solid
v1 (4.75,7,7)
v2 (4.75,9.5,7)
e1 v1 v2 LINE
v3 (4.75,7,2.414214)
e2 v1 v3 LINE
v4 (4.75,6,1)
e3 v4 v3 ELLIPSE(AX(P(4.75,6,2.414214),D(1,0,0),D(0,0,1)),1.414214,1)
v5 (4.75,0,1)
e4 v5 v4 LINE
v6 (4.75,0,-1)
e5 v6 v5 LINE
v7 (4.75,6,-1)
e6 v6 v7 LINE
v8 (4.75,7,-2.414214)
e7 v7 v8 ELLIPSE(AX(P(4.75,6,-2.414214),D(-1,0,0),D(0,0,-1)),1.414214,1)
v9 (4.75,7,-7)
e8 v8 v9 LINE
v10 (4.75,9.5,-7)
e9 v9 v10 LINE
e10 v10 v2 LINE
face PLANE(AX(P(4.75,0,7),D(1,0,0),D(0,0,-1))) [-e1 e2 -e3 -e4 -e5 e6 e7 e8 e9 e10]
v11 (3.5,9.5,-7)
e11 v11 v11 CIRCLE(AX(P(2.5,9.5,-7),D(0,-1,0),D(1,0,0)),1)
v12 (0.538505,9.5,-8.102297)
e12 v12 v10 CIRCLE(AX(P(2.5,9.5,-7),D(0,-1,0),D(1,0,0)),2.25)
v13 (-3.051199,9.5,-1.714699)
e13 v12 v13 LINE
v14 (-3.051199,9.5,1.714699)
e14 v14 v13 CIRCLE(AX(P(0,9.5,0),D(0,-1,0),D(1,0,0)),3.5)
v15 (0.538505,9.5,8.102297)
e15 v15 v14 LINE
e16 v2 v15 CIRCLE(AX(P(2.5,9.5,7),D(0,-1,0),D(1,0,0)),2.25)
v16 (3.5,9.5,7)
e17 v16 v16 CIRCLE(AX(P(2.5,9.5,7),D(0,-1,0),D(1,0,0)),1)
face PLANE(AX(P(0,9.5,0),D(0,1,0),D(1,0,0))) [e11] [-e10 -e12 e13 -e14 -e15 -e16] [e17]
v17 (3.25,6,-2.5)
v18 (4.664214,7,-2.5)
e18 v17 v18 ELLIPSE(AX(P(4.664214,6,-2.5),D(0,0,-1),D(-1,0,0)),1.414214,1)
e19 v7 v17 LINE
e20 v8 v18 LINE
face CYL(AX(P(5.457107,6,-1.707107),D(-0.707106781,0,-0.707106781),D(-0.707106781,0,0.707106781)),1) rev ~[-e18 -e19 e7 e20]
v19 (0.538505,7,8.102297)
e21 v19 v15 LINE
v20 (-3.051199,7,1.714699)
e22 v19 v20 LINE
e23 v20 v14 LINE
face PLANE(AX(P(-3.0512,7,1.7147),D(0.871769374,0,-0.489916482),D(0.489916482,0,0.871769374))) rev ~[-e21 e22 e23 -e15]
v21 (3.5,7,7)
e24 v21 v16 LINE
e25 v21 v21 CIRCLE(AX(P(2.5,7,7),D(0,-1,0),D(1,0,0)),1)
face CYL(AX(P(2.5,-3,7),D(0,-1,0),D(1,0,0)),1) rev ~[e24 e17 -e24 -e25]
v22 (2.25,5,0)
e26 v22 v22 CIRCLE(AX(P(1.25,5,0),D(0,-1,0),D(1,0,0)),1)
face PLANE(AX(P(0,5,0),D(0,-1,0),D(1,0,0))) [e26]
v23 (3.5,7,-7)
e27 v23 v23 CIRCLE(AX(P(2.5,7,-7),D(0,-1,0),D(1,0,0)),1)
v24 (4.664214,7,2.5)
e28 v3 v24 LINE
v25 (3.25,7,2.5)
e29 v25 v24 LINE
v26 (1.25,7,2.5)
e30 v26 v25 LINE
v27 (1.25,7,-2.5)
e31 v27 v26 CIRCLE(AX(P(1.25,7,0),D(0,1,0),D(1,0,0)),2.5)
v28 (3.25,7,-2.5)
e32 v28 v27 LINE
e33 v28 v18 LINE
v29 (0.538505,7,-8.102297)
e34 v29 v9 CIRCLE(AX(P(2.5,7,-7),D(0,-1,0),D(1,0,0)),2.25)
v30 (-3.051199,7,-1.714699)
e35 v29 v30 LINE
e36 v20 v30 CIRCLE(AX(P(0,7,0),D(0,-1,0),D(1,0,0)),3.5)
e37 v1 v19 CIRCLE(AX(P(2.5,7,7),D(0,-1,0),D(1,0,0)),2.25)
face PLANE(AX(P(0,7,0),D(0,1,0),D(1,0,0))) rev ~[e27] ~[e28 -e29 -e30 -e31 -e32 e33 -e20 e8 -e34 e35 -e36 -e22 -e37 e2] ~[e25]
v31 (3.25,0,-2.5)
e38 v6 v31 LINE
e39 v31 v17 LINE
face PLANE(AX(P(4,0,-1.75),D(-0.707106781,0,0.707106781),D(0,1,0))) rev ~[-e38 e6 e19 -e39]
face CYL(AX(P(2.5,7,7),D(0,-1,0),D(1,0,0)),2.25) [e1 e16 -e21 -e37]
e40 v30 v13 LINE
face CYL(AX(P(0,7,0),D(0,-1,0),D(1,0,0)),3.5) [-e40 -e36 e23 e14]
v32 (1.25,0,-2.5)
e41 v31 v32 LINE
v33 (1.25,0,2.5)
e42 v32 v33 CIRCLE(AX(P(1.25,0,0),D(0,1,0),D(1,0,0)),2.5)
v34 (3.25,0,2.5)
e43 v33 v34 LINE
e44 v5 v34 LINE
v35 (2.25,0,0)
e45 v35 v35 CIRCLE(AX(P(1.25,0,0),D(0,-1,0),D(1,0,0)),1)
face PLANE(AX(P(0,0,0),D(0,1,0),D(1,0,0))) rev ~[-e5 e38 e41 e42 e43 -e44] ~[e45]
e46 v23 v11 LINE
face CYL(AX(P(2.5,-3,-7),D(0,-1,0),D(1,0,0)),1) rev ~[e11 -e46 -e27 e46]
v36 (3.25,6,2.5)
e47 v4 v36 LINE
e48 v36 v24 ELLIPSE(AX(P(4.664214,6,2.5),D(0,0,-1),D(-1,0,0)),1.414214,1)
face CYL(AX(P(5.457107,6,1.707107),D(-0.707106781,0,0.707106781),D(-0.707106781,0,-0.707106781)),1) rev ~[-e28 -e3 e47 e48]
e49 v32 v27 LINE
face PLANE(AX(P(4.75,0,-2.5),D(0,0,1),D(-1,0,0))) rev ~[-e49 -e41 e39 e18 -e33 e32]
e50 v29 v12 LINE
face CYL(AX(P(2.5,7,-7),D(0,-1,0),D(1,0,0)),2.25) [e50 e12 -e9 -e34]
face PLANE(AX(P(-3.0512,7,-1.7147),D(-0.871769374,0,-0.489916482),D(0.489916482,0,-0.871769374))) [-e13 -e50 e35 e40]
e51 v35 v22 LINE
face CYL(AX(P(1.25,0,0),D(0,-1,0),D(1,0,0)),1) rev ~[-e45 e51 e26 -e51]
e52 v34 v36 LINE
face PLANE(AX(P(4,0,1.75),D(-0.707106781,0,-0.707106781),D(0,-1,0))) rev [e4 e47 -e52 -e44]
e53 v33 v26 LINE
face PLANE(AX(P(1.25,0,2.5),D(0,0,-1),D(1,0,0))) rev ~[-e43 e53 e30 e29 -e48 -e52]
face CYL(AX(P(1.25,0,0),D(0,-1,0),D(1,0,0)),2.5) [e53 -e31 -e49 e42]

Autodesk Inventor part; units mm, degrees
ref_plane "YZ Plane" through (0, 0, 0) normal (1, 0, 0) x (0, 1, 0)
ref_plane "XZ Plane" through (0, 0, 0) normal (0, 1, 0) x (-1, 0, 0)
ref_plane "XY Plane" through (0, 0, 0) normal (0, 0, 1) x (1, 0, 0)
sketch "Sketch1" plane through (0, 0, 0) normal (0, 1, 0) x (-1, 0, 0)
  circle A0 centre (0, 0) radius 2.5
  dimension "d0" = 5
extrude "Extrusion1" add sketch "Sketch1" along normal blind 7
sketch "Sketch2" plane through (0, 7, 0) normal (0, 1, 0) x (1, 0, 0)
  circle A0 centre (0, 0) radius 2.5 projected
  circle A1 centre (0, 0) radius 3.5
  line L0 (0, 0) -> (2.5, 0)
  line L1 (2.5, 0) -> (2.5, 7)
  line L2 (2.5, 0) -> (2.5, -7)
  circle A2 centre (2.5, -7) radius 2.25
  circle A3 centre (2.5, 7) radius 2.25
  line L3 (0, 0) -> (-3.0512, -1.7147)
  line L4 (-3.0512, -1.7147) -> (0.5385, -8.1023)
  line L5 (2.5, -7) -> (0.5385, -8.1023)
  line L6 (2.5, 7) -> (0.5385, 8.1023)
  line L7 (0, 0) -> (-3.0512, 1.7147)
  line L8 (-3.0512, 1.7147) -> (0.5385, 8.1023)
  line L9 (2.5, -7) -> (4.75, -7)
  line L10 (2.5, 7) -> (4.75, 7)
  line L11 (4.75, 7) -> (4.75, -7)
  dimension "d3" = 7
  dimension "d4" = 2.5
  dimension "d5" = 7
  dimension "d6" = 7
  dimension "d7" = 4.5
  dimension "d8" = 4.5
extrude "Extrusion2" add sketch "Sketch2" along normal blind 3
sketch "Sketch4" plane through (0, 0, 0) normal (0, -1, 0) x (1, 0, 0)
  line L0 (4.75, 7) -> (4.75, -7) projected
  arc A0 (4.75, 7) -> (0.5385, 8.1023) centre (2.5, 7) ccw projected
  line L1 (-3.0512, 1.7147) -> (0.5385, 8.1023) projected
  arc A1 (-3.0512, 1.7147) -> (-3.0512, -1.7147) centre (0, 0) ccw projected
  line L2 (0.5385, -8.1023) -> (-3.0512, -1.7147) projected
  arc A2 (0.5385, -8.1023) -> (4.75, -7) centre (2.5, -7) ccw projected
  circle A3 centre (0, 0) radius 2.5 projected
extrude "Extrusion4" add sketch "Sketch4" along normal blind 3 contours L0 A2 L2 A1 L1 A0 | A3
sketch "Sketch5" plane through (0, 7, 0) normal (0, -1, 0) x (1, 0, 0)
  circle A0 centre (0, 0) radius 2.5 projected
  line L0 (4.75, -7) -> (4.75, 7) projected
  line L1 (0, 0) -> (0, 2.5)
  circle A1 centre (0, 0) radius 2.5 projected
  line L2 (4.75, -7) -> (4.75, 7) projected
  line L3 (0, 2.5) -> (4.75, 2.5)
  line L4 (4.75, 2.5) -> (4.75, -2.5)
  line L5 (4.75, -2.5) -> (0, -2.5)
  line L6 (0, -2.5) -> (0, 2.5)
  point P0 (6.25, 2.5)
  point P1 (4.75, 7.3386)
  point P2 (4.75, 2.5)
extrude "Extrusion5" add sketch "Sketch5" along normal up to surface (7 mm away) contours A0 L3 L0 L5
sketch "Sketch7" plane through (0, -3, 0) normal (0, -1, 0) x (1, 0, 0)
  arc A0 (0.5385, -8.1023) -> (4.75, -7) centre (2.5, -7) ccw projected
  line L0 (4.75, -7) -> (4.75, 7) projected
  arc A1 (4.75, 7) -> (0.5385, 8.1023) centre (2.5, 7) ccw projected
  line L1 (0.5385, 8.1023) -> (-3.0512, 1.7147) projected
  arc A2 (-3.0512, 1.7147) -> (-3.0512, -1.7147) centre (0, 0) ccw projected
  line L2 (-3.0512, -1.7147) -> (0.5385, -8.1023) projected
  circle A3 centre (2.5, -7) radius 1
  circle A4 centre (2.5, 7) radius 1
  dimension "d27" = 2
  dimension "d28" = 2
extrude "Extrusion7" cut sketch "Sketch7" against normal up to surface (13 mm away) contours A3 | A4
thicken "Thicken1" operation add thickness 0.5 both sides no extend neighbours yes toward (0, 1, 0) faces at (0.73, -3, -0.5716)
thicken "Thicken2" operation add thickness 0.5 both sides no extend neighbours yes toward (0, -1, 0) faces at (0.73, 10, 0.5716)
sketch "Sketch8" plane through (0, 0, 0) normal (0, 1, 0) x (1, 0, 0)
  arc A0 (0, 2.5) -> (0, -2.5) centre (0, 0) ccw projected
  line L0 (0, 0) -> (1.5, 0)
  circle A1 centre (1.5, 0) radius 2.5
  line L1 (0, 2.5) -> (4.75, 2.5) projected
  line L2 (4.75, -2.5) -> (0, -2.5) projected
  line L3 (1.5, 0) -> (1.5, 2.5)
  line L4 (1.5, 2.5) -> (0, 2.5)
  line L5 (1.5, 0) -> (1.375, -2.5)
  line L6 (1.375, -2.5) -> (0, -2.5)
  line L7 (0, -2.5) -> (1.5, -2.5)
  line L8 (1.5, -2.5) -> (1.5, 2.5)
  line L9 (1.5, 2.5) -> (0, 2.5)
  line L10 (0, 2.5) -> (0, -2.5)
  point P0 (2.75, 2.5)
  point P1 (2.75, -2.5)
  point P2 (1.3752, -2.4969)
  point P3 (3.75, 2.5)
  point P4 (3.75, -2.5)
  dimension "d36" = 5
  dimension "d35" = 1.5
extrude "Extrusion8" cut sketch "Sketch8" along normal up to surface (7 mm away) contours L10 A1 A0 | L1 A1 L10 | L10 A1 L5 L2
sketch "Sketch11" plane through (0, 7, 0) normal (0, -1, 0) x (1, 0, 0)
  circle A0 centre (2.5, 7) radius 1 projected
  circle A1 centre (2.5, -7) radius 1 projected
  line L0 (-3.0512, 1.7147) -> (0.5385, 8.1023) projected
  arc A2 (4.75, 7) -> (0.5385, 8.1023) centre (2.5, 7) ccw projected
  line L1 (4.75, 7) -> (4.75, -7) projected
  arc A3 (0.5385, -8.1023) -> (4.75, -7) centre (2.5, -7) ccw projected
  line L2 (0.5385, -8.1023) -> (-3.0512, -1.7147) projected
  arc A4 (-3.0512, 1.7147) -> (-3.0512, -1.7147) centre (0, 0) ccw projected
extrude "Extrusion9" cut sketch "Sketch11" along normal up to surface (7 mm away)
sketch "Sketch12" plane through (0, 0, 0) normal (0, 1, 0) x (1, 0, 0)
  circle A0 centre (2.5, -7) radius 1 projected
  circle A1 centre (2.5, 7) radius 1 projected
  line L0 (4.75, 7) -> (4.75, -7) projected
  arc A2 (4.75, 7) -> (0.5385, 8.1023) centre (2.5, 7) ccw projected
  line L1 (-3.0512, 1.7147) -> (0.5385, 8.1023) projected
  arc A3 (-3.0512, 1.7147) -> (-3.0512, -1.7147) centre (0, 0) ccw projected
  line L2 (0.5385, -8.1023) -> (-3.0512, -1.7147) projected
  arc A4 (0.5385, -8.1023) -> (4.75, -7) centre (2.5, -7) ccw projected
  line L3 (4.75, 7) -> (4.75, -7) projected
  line L4 (4.75, 0) -> (3.75, 0)
  line L5 (3.75, 0) -> (1.25, 0)
  circle A5 centre (1.25, 0) radius 2.5
  line L6 (1.25, 0) -> (1.25, -2.5)
  line L7 (1.25, -2.5) -> (4.75, -2.5)
  line L8 (4.75, -2.5) -> (4.75, 2.5)
  line L9 (4.75, 2.5) -> (1.25, 2.5)
  line L10 (1.25, 2.5) -> (1.25, -2.5)
  point P0 (4.75, 2.5)
  dimension "d45" = 1
  dimension "d46" = 2.5
  dimension "d47" = 5
  dimension "d48" = 3.5
  dimension "d49" = 5
extrude "Extrusion10" add sketch "Sketch12" along normal up to surface (7 mm away) contours L0 L4 A5 L9 | L0 L7 A5 L4 | L10 L6 A5 | A5 L5 L10 | A5 L6 L5
chamfer "Chamfer2" distance 1.5 angle 45 2 edges at (4.75, 3.5, 2.5) (4.75, 3.5, -2.5)
sketch "Sketch13" plane through (0, 0, 0) normal (0, 1, 0) x (1, 0, 0)
  circle A0 centre (2.5, -7) radius 1 projected
  circle A1 centre (2.5, 7) radius 1 projected
  line L0 (-3.0512, 1.7147) -> (0.5385, 8.1023) projected
  arc A2 (4.75, 7) -> (0.5385, 8.1023) centre (2.5, 7) ccw projected
  line L1 (4.75, 7) -> (4.75, -7) projected
  arc A3 (0.5385, -8.1023) -> (4.75, -7) centre (2.5, -7) ccw projected
  line L2 (0.5385, -8.1023) -> (-3.0512, -1.7147) projected
  arc A4 (-3.0512, 1.7147) -> (-3.0512, -1.7147) centre (0, 0) ccw projected
extrude "Extrusion11" cut sketch "Sketch13" against normal blind 10
sketch "Sketch14" plane through (0, 0, 0) normal (0, -1, 0) x (1, 0, 0)
  line L0 (4.75, -1) -> (3.25, -2.5) projected
  line L1 (4.75, 1) -> (4.75, -1) projected
  line L2 (3.25, 2.5) -> (4.75, 1) projected
  line L3 (3.25, 2.5) -> (1.25, 2.5) projected
  arc A0 (1.25, 2.5) -> (1.25, -2.5) centre (1.25, 0) ccw projected
  line L4 (1.25, -2.5) -> (3.25, -2.5) projected
  circle A1 centre (1.25, 0) radius 1
  point P0 (0, 0)
  dimension "d58" = 2
extrude "Extrusion12" cut sketch "Sketch14" against normal blind 5 contours A1
fillet "Fillet3" radius 1 2 edges at (4, 7, -1.75) (4, 7, 1.75)
properties part number "belt_tendor_1"
